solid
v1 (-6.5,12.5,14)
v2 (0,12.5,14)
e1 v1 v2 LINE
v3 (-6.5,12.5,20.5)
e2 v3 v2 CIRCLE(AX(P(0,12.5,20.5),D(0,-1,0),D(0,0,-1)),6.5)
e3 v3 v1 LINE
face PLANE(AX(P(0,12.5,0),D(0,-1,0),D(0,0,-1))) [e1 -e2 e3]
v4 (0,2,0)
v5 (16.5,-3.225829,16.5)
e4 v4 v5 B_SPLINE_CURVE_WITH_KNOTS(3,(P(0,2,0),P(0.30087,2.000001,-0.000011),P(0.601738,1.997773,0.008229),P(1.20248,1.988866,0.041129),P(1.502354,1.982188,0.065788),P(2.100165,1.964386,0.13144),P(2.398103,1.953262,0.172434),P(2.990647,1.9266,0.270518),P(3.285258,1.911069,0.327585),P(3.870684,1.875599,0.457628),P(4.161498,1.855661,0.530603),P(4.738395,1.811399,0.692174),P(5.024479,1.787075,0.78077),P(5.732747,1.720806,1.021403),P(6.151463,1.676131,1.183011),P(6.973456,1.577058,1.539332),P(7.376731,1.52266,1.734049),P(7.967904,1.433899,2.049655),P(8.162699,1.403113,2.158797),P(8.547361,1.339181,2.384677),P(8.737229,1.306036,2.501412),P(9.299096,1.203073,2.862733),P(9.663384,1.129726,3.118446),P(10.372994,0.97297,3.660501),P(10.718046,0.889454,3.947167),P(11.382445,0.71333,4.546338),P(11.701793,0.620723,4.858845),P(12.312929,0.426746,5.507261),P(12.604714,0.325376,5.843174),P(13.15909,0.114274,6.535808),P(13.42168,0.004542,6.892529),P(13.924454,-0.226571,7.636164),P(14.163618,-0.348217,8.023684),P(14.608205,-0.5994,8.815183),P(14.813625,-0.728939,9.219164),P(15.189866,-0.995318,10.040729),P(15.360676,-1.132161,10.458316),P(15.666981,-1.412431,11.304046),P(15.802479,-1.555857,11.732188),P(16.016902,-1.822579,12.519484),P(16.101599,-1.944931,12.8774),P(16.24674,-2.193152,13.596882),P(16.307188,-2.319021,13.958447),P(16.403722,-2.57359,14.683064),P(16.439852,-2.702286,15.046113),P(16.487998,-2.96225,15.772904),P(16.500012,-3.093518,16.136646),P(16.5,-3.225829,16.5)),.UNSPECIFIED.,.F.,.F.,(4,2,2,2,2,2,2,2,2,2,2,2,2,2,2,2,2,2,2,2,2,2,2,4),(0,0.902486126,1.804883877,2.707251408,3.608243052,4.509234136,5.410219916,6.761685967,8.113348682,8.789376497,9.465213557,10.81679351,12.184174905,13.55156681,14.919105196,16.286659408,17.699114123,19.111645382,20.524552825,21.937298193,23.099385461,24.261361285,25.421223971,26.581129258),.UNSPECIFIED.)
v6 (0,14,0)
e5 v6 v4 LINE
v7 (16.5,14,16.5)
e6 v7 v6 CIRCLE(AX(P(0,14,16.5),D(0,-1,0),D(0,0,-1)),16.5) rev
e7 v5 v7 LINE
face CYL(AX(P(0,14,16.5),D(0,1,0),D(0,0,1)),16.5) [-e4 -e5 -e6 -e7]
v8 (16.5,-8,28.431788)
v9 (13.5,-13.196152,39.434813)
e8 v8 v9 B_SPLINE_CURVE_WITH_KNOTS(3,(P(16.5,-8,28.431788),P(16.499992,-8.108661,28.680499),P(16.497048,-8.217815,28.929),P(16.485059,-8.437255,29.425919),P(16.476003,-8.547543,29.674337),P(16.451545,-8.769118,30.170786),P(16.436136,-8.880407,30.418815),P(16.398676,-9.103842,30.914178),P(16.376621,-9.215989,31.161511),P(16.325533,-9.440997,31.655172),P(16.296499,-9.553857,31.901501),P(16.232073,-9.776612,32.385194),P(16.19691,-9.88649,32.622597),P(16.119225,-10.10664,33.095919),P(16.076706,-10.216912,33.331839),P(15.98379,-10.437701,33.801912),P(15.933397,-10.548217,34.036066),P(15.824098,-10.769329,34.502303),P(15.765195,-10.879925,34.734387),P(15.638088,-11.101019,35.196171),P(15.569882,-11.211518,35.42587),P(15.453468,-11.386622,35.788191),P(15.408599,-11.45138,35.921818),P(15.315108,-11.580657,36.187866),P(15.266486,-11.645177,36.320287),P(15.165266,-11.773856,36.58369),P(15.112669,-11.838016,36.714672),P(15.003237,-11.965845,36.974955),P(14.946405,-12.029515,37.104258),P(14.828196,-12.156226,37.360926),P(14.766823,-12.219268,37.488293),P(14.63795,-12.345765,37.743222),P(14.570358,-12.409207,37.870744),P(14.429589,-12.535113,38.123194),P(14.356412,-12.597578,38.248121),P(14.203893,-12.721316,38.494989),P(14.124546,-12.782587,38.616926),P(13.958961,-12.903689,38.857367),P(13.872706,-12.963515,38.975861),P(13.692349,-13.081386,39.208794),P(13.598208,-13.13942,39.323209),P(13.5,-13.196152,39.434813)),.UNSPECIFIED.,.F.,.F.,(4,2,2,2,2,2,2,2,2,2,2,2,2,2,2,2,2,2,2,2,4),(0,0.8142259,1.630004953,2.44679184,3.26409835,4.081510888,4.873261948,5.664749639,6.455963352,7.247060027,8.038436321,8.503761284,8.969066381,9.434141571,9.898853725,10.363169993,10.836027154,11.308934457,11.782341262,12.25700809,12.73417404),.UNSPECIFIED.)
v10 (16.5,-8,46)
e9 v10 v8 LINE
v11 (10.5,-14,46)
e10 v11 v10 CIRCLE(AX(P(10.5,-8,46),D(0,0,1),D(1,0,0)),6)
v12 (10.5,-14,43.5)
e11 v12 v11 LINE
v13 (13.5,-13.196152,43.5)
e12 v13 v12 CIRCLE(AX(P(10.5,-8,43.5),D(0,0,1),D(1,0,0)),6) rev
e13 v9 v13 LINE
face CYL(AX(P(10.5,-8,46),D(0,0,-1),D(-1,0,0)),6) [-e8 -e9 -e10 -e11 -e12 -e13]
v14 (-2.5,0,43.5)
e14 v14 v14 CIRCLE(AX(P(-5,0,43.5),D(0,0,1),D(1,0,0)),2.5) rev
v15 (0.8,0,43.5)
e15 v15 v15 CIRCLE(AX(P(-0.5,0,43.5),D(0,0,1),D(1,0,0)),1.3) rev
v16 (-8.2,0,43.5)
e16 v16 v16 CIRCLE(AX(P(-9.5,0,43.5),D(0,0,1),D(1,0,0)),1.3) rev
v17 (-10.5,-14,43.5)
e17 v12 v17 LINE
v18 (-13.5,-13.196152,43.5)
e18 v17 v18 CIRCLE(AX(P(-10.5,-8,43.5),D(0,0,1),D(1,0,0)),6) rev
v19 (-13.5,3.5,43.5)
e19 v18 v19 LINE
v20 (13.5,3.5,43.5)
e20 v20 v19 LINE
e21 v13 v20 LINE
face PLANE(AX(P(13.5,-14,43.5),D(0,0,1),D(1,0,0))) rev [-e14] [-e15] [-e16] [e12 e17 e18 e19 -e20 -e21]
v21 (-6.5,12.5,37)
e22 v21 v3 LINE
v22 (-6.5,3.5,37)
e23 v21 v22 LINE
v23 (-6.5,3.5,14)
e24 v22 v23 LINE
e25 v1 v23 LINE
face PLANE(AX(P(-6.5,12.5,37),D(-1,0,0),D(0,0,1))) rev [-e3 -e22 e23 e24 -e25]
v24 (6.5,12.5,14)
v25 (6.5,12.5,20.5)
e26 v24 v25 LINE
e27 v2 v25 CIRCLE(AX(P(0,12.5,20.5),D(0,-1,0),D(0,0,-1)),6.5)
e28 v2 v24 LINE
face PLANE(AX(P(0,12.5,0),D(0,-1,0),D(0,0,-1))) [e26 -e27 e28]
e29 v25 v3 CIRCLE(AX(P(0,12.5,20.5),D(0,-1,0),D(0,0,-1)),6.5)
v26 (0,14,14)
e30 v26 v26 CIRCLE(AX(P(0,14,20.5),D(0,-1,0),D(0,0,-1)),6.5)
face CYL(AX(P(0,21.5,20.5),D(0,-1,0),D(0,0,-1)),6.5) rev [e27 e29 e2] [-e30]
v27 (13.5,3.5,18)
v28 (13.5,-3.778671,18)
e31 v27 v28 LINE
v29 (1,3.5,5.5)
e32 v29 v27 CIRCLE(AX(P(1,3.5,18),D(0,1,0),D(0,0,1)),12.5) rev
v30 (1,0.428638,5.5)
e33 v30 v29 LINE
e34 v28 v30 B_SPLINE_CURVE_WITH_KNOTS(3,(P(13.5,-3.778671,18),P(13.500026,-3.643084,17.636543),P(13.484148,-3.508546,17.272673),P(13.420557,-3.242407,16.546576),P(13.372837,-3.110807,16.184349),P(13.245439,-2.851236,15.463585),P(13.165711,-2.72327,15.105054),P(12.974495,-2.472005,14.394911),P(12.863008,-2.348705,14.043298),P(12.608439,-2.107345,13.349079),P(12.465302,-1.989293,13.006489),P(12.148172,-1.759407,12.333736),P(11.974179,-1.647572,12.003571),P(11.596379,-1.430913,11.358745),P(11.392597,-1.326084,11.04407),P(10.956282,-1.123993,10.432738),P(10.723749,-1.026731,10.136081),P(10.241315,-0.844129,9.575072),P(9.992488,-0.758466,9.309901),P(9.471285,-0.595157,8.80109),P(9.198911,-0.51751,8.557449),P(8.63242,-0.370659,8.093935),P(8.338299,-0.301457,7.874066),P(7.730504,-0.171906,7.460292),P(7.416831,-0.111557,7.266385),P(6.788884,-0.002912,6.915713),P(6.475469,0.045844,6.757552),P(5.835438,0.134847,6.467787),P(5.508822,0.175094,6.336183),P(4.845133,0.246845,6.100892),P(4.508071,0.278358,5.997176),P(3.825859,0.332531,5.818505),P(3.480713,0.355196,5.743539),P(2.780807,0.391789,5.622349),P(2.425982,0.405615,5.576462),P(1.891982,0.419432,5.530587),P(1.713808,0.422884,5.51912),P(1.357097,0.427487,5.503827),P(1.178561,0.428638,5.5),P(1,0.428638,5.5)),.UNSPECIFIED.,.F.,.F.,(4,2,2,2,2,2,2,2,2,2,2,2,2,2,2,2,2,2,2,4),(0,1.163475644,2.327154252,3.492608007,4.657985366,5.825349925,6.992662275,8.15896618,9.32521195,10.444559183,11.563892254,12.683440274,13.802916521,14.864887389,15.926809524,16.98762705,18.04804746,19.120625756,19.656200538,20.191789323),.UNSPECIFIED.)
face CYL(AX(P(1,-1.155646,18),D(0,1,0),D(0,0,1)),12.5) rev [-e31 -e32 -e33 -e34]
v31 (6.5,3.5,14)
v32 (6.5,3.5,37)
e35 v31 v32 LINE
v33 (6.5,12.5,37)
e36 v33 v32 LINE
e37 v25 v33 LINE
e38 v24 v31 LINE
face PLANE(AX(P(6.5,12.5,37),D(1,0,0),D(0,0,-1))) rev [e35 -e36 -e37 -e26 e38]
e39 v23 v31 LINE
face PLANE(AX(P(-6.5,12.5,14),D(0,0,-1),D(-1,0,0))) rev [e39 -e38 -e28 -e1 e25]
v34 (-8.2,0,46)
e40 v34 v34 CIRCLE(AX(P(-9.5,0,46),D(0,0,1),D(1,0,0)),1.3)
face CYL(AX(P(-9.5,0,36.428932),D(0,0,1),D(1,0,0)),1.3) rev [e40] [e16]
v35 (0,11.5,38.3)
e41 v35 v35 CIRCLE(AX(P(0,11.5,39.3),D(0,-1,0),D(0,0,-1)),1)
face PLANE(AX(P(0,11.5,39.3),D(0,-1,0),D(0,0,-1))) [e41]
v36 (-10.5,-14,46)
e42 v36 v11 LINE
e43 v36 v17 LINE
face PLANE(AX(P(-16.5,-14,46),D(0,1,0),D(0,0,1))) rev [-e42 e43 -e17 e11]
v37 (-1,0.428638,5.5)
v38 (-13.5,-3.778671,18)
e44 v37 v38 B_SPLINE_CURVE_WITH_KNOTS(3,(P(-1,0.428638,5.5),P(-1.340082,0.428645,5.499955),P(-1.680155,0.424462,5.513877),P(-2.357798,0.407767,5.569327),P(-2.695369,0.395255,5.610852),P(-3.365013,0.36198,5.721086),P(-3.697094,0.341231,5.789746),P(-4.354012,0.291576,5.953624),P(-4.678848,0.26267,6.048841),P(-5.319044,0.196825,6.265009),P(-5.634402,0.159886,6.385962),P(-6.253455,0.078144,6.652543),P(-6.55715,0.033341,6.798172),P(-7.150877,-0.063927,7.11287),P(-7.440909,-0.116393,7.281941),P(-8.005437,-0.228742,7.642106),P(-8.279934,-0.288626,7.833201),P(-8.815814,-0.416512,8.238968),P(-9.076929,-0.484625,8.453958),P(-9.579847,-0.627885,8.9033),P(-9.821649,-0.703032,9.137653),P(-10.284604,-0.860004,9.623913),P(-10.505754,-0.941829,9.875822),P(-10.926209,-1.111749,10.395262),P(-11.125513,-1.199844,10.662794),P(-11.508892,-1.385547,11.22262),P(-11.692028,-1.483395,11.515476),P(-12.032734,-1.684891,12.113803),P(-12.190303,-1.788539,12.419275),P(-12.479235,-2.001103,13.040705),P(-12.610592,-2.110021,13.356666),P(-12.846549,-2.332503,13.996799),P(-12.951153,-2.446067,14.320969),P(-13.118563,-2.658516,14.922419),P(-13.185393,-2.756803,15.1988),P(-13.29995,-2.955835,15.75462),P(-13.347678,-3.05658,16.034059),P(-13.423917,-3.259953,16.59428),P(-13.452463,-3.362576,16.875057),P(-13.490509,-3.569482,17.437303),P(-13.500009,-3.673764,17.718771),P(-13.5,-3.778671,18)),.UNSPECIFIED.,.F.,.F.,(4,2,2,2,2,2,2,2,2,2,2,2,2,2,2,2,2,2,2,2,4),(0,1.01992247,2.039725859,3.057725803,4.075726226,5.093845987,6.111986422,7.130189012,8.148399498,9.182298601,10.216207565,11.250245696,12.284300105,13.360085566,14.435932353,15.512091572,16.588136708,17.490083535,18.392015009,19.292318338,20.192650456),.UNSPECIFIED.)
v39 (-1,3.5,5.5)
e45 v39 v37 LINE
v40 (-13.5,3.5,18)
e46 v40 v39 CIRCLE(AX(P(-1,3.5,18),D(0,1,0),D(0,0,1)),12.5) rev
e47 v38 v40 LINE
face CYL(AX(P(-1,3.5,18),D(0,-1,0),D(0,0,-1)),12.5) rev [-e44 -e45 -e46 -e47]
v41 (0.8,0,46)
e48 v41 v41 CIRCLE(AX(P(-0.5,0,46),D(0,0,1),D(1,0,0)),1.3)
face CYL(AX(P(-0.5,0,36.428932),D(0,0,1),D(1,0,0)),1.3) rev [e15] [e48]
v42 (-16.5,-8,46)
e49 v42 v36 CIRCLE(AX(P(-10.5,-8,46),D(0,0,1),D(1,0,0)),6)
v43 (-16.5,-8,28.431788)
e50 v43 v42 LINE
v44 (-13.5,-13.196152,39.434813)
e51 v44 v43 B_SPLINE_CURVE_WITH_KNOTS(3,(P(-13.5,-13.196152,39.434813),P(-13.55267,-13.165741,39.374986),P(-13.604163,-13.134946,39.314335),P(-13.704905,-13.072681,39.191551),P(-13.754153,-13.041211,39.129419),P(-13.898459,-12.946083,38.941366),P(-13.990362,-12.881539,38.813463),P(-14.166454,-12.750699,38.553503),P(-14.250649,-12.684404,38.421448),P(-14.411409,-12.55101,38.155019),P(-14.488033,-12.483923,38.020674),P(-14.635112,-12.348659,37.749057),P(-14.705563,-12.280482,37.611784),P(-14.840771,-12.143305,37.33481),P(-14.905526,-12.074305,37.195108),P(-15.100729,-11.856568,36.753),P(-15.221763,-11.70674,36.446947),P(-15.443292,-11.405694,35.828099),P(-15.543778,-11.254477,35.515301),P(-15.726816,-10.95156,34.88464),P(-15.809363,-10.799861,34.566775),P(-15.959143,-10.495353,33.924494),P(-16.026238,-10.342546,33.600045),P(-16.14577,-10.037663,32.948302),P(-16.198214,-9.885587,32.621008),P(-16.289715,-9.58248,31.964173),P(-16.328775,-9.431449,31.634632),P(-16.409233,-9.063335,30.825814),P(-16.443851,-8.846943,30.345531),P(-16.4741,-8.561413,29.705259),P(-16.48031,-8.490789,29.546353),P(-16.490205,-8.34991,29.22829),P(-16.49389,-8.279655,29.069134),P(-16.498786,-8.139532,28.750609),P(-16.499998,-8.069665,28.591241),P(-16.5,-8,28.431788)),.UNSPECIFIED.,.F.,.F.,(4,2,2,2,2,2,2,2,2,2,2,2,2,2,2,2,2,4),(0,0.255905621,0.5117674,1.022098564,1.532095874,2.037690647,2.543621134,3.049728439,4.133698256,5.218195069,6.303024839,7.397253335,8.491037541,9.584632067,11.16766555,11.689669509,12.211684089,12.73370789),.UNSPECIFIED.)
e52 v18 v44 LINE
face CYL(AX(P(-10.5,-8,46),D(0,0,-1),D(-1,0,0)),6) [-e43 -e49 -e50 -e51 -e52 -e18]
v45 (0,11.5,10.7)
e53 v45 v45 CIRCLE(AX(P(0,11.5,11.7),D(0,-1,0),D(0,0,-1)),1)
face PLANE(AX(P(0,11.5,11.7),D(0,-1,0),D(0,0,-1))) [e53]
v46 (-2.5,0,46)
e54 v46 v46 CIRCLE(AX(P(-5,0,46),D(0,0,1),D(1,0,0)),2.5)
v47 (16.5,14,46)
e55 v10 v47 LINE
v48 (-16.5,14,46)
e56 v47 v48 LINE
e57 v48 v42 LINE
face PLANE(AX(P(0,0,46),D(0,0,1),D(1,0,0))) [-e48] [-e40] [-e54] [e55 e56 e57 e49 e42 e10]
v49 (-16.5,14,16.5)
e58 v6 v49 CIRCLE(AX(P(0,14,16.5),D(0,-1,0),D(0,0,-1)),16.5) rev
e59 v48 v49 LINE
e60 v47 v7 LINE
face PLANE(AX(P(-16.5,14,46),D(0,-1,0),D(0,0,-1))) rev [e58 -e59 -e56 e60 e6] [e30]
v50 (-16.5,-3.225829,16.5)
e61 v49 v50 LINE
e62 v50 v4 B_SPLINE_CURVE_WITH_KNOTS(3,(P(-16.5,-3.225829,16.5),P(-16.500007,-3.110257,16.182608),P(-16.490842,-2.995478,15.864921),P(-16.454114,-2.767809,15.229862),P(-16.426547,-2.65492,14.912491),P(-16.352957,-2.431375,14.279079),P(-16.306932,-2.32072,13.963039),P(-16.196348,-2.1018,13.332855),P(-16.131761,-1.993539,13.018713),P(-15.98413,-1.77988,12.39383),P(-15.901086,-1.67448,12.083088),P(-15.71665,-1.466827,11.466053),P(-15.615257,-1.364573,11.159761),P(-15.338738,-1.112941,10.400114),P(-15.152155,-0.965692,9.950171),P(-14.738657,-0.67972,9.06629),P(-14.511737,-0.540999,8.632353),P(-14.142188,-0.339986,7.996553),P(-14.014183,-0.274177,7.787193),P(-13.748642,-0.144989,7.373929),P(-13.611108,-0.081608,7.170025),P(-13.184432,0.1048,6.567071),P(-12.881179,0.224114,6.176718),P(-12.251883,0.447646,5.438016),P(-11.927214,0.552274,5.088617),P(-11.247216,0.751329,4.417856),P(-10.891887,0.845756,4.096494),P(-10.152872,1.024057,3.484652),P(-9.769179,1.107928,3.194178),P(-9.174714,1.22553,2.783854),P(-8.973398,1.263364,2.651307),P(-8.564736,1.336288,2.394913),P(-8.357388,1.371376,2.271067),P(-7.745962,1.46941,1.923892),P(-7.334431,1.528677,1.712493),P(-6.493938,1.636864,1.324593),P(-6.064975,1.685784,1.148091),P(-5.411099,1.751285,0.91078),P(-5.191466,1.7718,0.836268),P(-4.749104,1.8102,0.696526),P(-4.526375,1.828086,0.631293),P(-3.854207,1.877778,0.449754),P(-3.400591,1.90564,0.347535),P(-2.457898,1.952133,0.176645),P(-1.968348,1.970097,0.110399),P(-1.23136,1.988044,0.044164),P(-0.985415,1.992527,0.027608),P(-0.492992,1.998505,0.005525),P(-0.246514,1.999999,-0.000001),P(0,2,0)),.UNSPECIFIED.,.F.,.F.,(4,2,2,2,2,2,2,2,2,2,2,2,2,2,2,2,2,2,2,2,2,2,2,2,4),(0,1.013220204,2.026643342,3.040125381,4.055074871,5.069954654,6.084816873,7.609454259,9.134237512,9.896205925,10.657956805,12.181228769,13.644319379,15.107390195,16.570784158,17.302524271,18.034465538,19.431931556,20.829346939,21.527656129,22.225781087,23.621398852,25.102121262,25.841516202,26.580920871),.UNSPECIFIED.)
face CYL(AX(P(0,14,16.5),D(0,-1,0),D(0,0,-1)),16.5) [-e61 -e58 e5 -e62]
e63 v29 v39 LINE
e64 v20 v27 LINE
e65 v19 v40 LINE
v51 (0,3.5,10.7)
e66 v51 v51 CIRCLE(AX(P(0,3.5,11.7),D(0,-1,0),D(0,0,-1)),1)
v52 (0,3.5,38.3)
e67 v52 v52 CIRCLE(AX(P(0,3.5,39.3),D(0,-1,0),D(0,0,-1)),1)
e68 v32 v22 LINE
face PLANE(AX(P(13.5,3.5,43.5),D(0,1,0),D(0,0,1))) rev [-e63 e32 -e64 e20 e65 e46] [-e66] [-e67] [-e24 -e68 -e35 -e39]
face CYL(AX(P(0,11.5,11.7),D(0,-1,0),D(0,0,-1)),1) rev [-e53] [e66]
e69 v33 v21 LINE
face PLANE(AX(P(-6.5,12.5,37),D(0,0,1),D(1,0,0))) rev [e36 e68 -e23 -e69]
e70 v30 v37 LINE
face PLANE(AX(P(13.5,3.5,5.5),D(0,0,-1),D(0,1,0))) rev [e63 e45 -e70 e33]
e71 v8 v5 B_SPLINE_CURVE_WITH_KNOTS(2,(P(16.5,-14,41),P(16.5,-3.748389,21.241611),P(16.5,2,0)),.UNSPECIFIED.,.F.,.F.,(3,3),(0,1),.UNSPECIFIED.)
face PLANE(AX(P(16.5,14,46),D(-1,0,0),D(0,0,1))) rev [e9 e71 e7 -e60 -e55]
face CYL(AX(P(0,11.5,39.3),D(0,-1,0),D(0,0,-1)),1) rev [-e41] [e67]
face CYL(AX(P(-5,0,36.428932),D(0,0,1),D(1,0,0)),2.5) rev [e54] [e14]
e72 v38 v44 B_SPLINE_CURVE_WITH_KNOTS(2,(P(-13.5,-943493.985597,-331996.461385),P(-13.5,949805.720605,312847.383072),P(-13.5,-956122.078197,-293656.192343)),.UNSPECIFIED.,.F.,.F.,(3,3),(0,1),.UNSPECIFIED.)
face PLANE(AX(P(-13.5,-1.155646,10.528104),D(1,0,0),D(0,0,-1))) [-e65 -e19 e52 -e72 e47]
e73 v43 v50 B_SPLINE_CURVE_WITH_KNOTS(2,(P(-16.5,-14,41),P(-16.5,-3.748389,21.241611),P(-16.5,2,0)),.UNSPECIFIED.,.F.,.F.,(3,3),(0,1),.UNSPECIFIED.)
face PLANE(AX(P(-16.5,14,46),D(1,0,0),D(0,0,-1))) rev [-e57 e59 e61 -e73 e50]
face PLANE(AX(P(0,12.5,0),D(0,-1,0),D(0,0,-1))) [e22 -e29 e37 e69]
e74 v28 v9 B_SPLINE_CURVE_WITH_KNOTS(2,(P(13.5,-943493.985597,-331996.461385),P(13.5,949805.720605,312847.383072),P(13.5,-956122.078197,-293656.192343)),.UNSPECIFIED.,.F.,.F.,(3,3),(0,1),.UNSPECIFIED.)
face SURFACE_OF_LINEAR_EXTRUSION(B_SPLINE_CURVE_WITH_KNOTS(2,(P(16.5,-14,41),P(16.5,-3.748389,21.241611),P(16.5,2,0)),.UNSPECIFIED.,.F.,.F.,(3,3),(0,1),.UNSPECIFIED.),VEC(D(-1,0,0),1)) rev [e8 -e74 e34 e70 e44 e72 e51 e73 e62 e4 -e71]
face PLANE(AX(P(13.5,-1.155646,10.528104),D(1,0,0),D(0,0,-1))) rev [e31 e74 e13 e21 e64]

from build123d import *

# Parameters (mm, degrees)
SKETCH1_W           = 33
SKETCH1_H           = 28
BOSS_EXTRUDE1_DEPTH = 46
CUT_EXTRUDE1_DEPTH  = 59.318093247
CUT_EXTRUDE2_START  = -3
CUT_EXTRUDE2_DEPTH  = 27
FILLET1_R           = 12.5
FILLET2_R           = 16.5
FILLET3_R           = 6
SKETCH6_W           = 13
SKETCH6_H           = 23
CUT_EXTRUDE3_DEPTH  = 9
SKETCH8_R           = 6.5
CUT_EXTRUDE4_DEPTH  = 9
SKETCH9_R           = 1
CUT_EXTRUDE5_DEPTH  = 8
SKETCH10_R          = 1.3
SKETCH10_R_2        = 2.5
CUT_EXTRUDE6_DEPTH  = 2.5


with BuildPart() as part:
    # Sketch1 → Boss-Extrude1 (new body)
    with BuildSketch(Plane.XY):
        Rectangle(SKETCH1_W, SKETCH1_H)
    extrude(amount=BOSS_EXTRUDE1_DEPTH)

    # Sketch3 → Cut-Extrude1 (cut, through all)
    with BuildSketch(Plane.ZY.offset(16.5)):
        with BuildLine():
            Line((0, 2), (0, -14))
            Line((0, -14), (41, -14))
            add(Edge.make_bspline(
                [(41, -14), (21.241610725, -3.748388801), (0, 2)],
                knots=[0, 0, 0, 1, 1, 1], degree=2))
        make_face()
    extrude(amount=-CUT_EXTRUDE1_DEPTH, mode=Mode.SUBTRACT)

    # Sketch4 → Cut-Extrude2 (cut)
    with BuildSketch(Plane.ZY.offset(16.5).offset(CUT_EXTRUDE2_START)):
        with BuildLine():
            Line((41, -14), (43.5, -14))
            Line((43.5, -14), (43.5, 3.5))
            Line((43.5, 3.5), (5.5, 3.5))
            Line((5.5, 3.5), (5.5, 0.428638096))
            add(Edge.make_bspline(
                [(41, -14), (23.811256263, -5.081645607), (5.5, 0.428638096)],
                knots=[0, 0, 0, 1, 1, 1], degree=2))
        make_face()
    extrude(amount=-CUT_EXTRUDE2_DEPTH, mode=Mode.SUBTRACT)

    # Fillet1
    fillet1_edges = [part.edges().sort_by_distance(p)[0] for p in [
        (-13.5, 1.964319048, 5.5),
        (13.5, 1.964319048, 5.5),
    ]]
    fillet(fillet1_edges, radius=FILLET1_R)

    # Fillet2
    fillet2_edges = [part.edges().sort_by_distance(p)[0] for p in [
        (-16.5, 8, 0),
        (16.5, 8, 0),
    ]]
    fillet(fillet2_edges, radius=FILLET2_R - 0.0001)  # a hair under: the kernel refuses the full size

    # Fillet3
    fillet3_edges = [part.edges().sort_by_distance(p)[0] for p in [
        (16.5, -14, 43.5),
        (-16.5, -14, 43.5),
    ]]
    fillet(fillet3_edges, radius=FILLET3_R)

    # Sketch6 → Cut-Extrude3 (cut)
    with BuildSketch(Plane.XZ.offset(-3.5)):
        with Locations((0, 25.5)):
            Rectangle(SKETCH6_W, SKETCH6_H)
    extrude(amount=-CUT_EXTRUDE3_DEPTH, mode=Mode.SUBTRACT)

    # Sketch8 → Cut-Extrude4 (cut)
    with BuildSketch(Plane.XZ.offset(-12.5)):
        with Locations(Location((0, 20.5, 0), (0, 0, 270))):
            Circle(SKETCH8_R)
    extrude(amount=-CUT_EXTRUDE4_DEPTH, mode=Mode.SUBTRACT)

    # Sketch9 → Cut-Extrude5 (cut)
    with BuildSketch(Plane.XZ.offset(-3.5)):
        with Locations(Location((0, 39.3, 0), (0, 0, 270))):
            Circle(SKETCH9_R)
        with Locations(Location((0, 11.7, 0), (0, 0, 270))):
            Circle(SKETCH9_R)
    extrude(amount=-CUT_EXTRUDE5_DEPTH, mode=Mode.SUBTRACT)

    # Sketch10 → Cut-Extrude6 (cut)
    with BuildSketch(Plane.XY.offset(46)):
        with Locations((-9.5, 0)):
            Circle(SKETCH10_R)
        with Locations((-5, 0)):
            Circle(SKETCH10_R_2)
        with Locations((-0.5, 0)):
            Circle(SKETCH10_R)
    extrude(amount=-CUT_EXTRUDE6_DEPTH, mode=Mode.SUBTRACT)


solid = part.part
